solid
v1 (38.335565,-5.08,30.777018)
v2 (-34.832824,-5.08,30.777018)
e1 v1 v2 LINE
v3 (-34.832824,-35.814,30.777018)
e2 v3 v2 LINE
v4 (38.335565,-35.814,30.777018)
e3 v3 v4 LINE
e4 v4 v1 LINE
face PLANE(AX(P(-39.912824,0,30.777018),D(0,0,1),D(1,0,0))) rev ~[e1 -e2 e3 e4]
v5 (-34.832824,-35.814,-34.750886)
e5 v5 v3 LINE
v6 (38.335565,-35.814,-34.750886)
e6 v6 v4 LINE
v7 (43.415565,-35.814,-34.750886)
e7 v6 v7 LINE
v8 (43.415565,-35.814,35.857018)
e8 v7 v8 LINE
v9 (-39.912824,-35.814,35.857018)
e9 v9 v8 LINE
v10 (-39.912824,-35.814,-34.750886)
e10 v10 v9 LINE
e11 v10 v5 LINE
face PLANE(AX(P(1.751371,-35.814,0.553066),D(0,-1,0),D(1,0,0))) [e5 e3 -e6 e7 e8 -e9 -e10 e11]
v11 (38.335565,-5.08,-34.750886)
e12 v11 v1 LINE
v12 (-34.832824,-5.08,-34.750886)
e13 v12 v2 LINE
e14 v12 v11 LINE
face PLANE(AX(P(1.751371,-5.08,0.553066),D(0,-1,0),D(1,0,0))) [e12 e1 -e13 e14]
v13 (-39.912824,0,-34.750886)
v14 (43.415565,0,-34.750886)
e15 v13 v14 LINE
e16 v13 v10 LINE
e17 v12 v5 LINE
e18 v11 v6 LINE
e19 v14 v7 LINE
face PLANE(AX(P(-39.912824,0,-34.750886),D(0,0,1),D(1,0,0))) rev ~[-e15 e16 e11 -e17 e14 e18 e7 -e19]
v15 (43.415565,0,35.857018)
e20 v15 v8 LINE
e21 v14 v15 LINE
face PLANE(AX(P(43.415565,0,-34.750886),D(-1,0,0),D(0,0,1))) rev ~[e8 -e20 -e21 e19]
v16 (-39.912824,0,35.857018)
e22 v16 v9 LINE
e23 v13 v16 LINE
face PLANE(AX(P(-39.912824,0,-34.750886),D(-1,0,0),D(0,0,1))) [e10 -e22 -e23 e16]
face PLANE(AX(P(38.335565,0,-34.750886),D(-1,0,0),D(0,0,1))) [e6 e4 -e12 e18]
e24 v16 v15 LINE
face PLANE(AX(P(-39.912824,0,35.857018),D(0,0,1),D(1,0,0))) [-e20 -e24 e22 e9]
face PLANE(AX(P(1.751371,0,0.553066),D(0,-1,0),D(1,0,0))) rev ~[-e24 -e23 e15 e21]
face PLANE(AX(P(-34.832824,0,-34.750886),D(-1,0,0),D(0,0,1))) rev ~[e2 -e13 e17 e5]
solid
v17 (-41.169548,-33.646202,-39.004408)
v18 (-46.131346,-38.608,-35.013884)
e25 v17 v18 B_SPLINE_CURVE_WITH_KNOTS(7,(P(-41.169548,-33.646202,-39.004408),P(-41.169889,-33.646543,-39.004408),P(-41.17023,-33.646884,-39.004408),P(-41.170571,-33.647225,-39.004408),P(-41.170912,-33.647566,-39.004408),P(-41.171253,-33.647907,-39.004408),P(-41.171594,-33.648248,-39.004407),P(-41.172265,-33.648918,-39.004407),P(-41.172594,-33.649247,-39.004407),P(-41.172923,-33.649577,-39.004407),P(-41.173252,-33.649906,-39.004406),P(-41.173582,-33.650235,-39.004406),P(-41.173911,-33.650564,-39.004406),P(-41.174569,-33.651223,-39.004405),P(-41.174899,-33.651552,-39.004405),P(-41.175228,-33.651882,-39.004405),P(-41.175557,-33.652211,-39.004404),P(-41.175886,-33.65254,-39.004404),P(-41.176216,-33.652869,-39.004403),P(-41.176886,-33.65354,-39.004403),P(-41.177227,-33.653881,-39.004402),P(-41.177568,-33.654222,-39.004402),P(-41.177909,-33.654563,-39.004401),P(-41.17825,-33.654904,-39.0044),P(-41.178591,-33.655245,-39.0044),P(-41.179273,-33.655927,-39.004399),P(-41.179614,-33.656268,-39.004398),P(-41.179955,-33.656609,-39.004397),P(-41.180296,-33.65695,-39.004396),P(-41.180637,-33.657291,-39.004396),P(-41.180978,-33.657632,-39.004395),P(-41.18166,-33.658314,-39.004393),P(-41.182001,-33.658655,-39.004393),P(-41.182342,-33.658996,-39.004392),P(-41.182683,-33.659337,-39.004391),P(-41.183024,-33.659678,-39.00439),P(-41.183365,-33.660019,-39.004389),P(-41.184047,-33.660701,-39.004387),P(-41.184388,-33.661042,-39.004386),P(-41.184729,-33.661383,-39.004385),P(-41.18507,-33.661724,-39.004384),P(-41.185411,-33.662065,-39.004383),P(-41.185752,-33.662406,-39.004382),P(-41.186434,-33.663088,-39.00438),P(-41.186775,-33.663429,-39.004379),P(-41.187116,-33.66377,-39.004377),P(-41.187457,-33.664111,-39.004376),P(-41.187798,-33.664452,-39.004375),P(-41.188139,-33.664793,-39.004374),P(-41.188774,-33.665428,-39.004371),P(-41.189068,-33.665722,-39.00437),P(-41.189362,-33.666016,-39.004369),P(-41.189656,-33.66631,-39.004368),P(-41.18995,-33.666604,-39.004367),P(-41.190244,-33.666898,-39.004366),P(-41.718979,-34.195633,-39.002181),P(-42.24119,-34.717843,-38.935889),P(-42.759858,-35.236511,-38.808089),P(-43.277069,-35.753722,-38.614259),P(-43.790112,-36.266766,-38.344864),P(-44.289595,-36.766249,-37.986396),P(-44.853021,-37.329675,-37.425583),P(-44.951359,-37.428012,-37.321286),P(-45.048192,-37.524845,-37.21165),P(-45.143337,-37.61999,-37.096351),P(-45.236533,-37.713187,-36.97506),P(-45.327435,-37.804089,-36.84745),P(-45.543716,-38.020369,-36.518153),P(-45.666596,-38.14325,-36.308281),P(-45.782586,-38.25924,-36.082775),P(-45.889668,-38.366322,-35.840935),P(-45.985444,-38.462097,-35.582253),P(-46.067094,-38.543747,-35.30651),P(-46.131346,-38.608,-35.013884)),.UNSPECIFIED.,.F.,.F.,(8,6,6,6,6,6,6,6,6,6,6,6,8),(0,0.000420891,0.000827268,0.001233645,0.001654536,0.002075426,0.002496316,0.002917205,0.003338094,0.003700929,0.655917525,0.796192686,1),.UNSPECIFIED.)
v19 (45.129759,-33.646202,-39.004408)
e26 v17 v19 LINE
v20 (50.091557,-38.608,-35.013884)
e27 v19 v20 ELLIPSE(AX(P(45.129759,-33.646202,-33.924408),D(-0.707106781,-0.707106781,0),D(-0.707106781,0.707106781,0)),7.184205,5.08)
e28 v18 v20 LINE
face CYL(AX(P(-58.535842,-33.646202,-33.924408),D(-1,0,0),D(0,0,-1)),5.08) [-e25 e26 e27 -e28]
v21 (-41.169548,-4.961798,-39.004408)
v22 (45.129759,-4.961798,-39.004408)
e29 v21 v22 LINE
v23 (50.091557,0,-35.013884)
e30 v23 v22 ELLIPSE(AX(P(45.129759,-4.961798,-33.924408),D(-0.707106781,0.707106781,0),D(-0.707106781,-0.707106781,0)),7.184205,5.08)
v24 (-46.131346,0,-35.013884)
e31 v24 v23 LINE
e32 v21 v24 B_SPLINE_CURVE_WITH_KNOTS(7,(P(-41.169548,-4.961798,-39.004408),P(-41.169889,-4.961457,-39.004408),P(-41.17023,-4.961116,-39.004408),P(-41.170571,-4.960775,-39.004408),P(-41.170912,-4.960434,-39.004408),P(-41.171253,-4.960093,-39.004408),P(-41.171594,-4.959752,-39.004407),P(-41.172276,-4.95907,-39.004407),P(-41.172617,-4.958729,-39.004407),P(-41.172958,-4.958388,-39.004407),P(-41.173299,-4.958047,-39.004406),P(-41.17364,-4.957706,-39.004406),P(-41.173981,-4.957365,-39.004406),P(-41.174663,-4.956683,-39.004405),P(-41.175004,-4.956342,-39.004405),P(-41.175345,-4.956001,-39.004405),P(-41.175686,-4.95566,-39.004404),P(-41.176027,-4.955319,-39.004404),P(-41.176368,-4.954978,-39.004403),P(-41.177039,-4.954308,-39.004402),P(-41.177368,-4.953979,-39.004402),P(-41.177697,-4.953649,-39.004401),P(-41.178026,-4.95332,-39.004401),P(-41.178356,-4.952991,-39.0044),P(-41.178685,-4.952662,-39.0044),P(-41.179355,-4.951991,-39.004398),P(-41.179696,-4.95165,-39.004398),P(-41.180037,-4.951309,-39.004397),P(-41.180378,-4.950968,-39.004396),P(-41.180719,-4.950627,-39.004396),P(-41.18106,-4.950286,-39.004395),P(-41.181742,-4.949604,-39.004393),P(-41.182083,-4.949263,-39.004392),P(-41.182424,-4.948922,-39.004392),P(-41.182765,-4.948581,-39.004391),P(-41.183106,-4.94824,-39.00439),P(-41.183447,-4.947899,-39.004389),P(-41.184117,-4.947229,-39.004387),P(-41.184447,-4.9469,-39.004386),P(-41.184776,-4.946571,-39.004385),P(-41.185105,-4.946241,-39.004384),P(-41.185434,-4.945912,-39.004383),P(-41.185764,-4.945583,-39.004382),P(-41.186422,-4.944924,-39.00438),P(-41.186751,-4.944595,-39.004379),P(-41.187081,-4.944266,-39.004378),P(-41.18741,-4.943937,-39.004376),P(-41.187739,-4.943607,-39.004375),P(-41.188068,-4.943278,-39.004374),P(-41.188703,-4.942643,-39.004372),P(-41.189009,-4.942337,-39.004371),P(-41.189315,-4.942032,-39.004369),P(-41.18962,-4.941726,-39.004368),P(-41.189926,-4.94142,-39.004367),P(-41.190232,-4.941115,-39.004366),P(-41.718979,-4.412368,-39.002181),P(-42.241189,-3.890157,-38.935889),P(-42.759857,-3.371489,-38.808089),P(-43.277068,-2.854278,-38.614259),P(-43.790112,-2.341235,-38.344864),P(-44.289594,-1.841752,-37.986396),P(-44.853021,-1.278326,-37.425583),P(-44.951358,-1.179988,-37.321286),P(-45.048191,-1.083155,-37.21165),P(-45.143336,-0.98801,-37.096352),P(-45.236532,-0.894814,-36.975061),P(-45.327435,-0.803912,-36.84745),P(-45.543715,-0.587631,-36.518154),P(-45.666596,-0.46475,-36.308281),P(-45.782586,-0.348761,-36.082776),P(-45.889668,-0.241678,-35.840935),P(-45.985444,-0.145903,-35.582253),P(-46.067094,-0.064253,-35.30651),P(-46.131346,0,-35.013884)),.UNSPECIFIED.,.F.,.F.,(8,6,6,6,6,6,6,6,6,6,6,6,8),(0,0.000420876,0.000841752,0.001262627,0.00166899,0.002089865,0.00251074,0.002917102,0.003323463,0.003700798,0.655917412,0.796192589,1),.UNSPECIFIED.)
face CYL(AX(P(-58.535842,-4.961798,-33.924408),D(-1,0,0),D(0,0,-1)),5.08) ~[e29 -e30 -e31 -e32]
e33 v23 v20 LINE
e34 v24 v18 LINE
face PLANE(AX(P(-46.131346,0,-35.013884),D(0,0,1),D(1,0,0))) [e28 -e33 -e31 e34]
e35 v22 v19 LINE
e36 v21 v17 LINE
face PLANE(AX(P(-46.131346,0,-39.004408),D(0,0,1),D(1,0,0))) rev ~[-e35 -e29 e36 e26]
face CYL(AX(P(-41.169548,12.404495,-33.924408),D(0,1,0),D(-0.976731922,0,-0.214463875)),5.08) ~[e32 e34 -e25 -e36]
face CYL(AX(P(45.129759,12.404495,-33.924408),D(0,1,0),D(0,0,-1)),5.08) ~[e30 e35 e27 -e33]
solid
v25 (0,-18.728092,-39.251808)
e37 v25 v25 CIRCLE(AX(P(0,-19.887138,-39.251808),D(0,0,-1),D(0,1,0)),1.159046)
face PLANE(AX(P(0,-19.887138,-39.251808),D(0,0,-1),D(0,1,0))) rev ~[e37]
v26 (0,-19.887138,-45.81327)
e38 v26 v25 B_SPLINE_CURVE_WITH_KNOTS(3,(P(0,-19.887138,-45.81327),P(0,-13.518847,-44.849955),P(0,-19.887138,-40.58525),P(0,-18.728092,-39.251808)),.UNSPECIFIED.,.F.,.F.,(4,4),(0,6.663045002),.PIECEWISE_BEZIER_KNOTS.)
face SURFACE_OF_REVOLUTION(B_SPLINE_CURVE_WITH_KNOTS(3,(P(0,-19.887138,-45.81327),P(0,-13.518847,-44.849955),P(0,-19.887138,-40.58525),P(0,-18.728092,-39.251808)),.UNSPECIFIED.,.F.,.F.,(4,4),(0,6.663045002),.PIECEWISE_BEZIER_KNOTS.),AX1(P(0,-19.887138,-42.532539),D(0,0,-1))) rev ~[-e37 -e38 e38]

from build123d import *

# Parameters (mm, degrees)
F0_W        = 83.3283886313
F0_H        = 70.6079043448
F1_DEPTH    = 35.814
F2_T        = -5.08
F3_W        = 96.2229035795
F3_H        = 3.9905235171
F4_DEPTH    = 38.608
F5_T1_DEPTH = 121.0318943859
F5_T3_DEPTH = 63.4169908064


# Not quite as in the source:
# - a fillet or chamfer that OpenCascade refuses, or shapes differently, is made with other operations: its cross-section is extruded or revolved along the edge and cut away or added


with BuildPart() as f1:
    # F0 (on Front) → F1 (new body)
    with BuildSketch(Plane.XZ):
        with Locations((1.751370728, 0.5530659109)):
            Rectangle(F0_W, F0_H)
    extrude(amount=F1_DEPTH)

    # F2
    f2_openings = [f1.faces().sort_by_distance(p)[0] for p in [
        (1.751371, -35.814, 0.553066),
        (1.751371, -17.907, -34.750886),
    ]]
    offset(amount=F2_T, openings=f2_openings)


with BuildPart() as f4:
    # F3 (on Front) → F4 (new body)
    with BuildSketch(Plane.XZ):
        with Locations((1.980105415, -37.0091460645)):
            Rectangle(F3_W, F3_H)
    extrude(amount=F4_DEPTH)

    # F5: fillet of radius 5.08 on 4 edges, made by hand

    # F5_s2 → F5_t1 (cut)
    with BuildSketch(Plane.YZ.offset(-58.5358417779)):
        with BuildLine():
            ThreePointArc((-33.6462018387, -39.0044078231), (-36.8298993328, -37.8830023043), (-38.608, -35.013884306))
            Line((-38.608, -35.013884306), (-38.608, -39.0044078231))
            Line((-38.608, -39.0044078231), (-33.6462018387, -39.0044078231))
        make_face()
        with BuildLine():
            ThreePointArc((-4.9617981613, -39.0044078231), (-1.7781006672, -37.8830023043), (0, -35.013884306))
            Line((0, -35.013884306), (0, -39.0044078231))
            Line((0, -39.0044078231), (-4.9617981613, -39.0044078231))
        make_face()
    extrude(amount=F5_T1_DEPTH, mode=Mode.SUBTRACT)

    # F5_s4 → F5_t3 (cut)
    with BuildSketch(Plane.XZ.offset(-12.4044954032)):
        with BuildLine():
            ThreePointArc((45.1297590434, -39.0044078231), (48.3134565375, -37.8830023043), (50.0915572047, -35.013884306))
            Line((50.0915572047, -35.013884306), (50.0915572047, -39.0044078231))
            Line((50.0915572047, -39.0044078231), (45.1297590434, -39.0044078231))
        make_face()
        with BuildLine():
            ThreePointArc((-46.1313463748, -35.013884306), (-44.3532457075, -37.8830023043), (-41.1695482135, -39.0044078231))
            Line((-41.1695482135, -39.0044078231), (-46.1313463748, -39.0044078231))
            Line((-46.1313463748, -39.0044078231), (-46.1313463748, -35.013884306))
        make_face()
    extrude(amount=F5_T3_DEPTH, mode=Mode.SUBTRACT)


with BuildPart() as f7:
    # F6 (on Right) → F7 (revolve)
    with BuildSketch(Plane.YZ):
        with BuildLine():
            Line((-18.7280923128, -39.2518080771), (-19.8871381581, -39.2518080771))
            Line((-19.8871381581, -39.2518080771), (-19.8871381581, -45.8132699132))
            add(Edge.make_bspline(
                [(-19.8871381581, -45.8132699132), (-13.5188465938, -44.8499545455), (-19.8871381581, -40.5852496624), (-18.7280923128, -39.2518080771)],
                knots=[0, 0, 0, 0, 6.663045002, 6.663045002, 6.663045002, 6.663045002], degree=3))
        make_face()
    revolve(axis=Axis((0, -19.8871381581, -42.5325389951), (0, 0, -1)))


solid = Compound([f1.part, f4.part, f7.part])
